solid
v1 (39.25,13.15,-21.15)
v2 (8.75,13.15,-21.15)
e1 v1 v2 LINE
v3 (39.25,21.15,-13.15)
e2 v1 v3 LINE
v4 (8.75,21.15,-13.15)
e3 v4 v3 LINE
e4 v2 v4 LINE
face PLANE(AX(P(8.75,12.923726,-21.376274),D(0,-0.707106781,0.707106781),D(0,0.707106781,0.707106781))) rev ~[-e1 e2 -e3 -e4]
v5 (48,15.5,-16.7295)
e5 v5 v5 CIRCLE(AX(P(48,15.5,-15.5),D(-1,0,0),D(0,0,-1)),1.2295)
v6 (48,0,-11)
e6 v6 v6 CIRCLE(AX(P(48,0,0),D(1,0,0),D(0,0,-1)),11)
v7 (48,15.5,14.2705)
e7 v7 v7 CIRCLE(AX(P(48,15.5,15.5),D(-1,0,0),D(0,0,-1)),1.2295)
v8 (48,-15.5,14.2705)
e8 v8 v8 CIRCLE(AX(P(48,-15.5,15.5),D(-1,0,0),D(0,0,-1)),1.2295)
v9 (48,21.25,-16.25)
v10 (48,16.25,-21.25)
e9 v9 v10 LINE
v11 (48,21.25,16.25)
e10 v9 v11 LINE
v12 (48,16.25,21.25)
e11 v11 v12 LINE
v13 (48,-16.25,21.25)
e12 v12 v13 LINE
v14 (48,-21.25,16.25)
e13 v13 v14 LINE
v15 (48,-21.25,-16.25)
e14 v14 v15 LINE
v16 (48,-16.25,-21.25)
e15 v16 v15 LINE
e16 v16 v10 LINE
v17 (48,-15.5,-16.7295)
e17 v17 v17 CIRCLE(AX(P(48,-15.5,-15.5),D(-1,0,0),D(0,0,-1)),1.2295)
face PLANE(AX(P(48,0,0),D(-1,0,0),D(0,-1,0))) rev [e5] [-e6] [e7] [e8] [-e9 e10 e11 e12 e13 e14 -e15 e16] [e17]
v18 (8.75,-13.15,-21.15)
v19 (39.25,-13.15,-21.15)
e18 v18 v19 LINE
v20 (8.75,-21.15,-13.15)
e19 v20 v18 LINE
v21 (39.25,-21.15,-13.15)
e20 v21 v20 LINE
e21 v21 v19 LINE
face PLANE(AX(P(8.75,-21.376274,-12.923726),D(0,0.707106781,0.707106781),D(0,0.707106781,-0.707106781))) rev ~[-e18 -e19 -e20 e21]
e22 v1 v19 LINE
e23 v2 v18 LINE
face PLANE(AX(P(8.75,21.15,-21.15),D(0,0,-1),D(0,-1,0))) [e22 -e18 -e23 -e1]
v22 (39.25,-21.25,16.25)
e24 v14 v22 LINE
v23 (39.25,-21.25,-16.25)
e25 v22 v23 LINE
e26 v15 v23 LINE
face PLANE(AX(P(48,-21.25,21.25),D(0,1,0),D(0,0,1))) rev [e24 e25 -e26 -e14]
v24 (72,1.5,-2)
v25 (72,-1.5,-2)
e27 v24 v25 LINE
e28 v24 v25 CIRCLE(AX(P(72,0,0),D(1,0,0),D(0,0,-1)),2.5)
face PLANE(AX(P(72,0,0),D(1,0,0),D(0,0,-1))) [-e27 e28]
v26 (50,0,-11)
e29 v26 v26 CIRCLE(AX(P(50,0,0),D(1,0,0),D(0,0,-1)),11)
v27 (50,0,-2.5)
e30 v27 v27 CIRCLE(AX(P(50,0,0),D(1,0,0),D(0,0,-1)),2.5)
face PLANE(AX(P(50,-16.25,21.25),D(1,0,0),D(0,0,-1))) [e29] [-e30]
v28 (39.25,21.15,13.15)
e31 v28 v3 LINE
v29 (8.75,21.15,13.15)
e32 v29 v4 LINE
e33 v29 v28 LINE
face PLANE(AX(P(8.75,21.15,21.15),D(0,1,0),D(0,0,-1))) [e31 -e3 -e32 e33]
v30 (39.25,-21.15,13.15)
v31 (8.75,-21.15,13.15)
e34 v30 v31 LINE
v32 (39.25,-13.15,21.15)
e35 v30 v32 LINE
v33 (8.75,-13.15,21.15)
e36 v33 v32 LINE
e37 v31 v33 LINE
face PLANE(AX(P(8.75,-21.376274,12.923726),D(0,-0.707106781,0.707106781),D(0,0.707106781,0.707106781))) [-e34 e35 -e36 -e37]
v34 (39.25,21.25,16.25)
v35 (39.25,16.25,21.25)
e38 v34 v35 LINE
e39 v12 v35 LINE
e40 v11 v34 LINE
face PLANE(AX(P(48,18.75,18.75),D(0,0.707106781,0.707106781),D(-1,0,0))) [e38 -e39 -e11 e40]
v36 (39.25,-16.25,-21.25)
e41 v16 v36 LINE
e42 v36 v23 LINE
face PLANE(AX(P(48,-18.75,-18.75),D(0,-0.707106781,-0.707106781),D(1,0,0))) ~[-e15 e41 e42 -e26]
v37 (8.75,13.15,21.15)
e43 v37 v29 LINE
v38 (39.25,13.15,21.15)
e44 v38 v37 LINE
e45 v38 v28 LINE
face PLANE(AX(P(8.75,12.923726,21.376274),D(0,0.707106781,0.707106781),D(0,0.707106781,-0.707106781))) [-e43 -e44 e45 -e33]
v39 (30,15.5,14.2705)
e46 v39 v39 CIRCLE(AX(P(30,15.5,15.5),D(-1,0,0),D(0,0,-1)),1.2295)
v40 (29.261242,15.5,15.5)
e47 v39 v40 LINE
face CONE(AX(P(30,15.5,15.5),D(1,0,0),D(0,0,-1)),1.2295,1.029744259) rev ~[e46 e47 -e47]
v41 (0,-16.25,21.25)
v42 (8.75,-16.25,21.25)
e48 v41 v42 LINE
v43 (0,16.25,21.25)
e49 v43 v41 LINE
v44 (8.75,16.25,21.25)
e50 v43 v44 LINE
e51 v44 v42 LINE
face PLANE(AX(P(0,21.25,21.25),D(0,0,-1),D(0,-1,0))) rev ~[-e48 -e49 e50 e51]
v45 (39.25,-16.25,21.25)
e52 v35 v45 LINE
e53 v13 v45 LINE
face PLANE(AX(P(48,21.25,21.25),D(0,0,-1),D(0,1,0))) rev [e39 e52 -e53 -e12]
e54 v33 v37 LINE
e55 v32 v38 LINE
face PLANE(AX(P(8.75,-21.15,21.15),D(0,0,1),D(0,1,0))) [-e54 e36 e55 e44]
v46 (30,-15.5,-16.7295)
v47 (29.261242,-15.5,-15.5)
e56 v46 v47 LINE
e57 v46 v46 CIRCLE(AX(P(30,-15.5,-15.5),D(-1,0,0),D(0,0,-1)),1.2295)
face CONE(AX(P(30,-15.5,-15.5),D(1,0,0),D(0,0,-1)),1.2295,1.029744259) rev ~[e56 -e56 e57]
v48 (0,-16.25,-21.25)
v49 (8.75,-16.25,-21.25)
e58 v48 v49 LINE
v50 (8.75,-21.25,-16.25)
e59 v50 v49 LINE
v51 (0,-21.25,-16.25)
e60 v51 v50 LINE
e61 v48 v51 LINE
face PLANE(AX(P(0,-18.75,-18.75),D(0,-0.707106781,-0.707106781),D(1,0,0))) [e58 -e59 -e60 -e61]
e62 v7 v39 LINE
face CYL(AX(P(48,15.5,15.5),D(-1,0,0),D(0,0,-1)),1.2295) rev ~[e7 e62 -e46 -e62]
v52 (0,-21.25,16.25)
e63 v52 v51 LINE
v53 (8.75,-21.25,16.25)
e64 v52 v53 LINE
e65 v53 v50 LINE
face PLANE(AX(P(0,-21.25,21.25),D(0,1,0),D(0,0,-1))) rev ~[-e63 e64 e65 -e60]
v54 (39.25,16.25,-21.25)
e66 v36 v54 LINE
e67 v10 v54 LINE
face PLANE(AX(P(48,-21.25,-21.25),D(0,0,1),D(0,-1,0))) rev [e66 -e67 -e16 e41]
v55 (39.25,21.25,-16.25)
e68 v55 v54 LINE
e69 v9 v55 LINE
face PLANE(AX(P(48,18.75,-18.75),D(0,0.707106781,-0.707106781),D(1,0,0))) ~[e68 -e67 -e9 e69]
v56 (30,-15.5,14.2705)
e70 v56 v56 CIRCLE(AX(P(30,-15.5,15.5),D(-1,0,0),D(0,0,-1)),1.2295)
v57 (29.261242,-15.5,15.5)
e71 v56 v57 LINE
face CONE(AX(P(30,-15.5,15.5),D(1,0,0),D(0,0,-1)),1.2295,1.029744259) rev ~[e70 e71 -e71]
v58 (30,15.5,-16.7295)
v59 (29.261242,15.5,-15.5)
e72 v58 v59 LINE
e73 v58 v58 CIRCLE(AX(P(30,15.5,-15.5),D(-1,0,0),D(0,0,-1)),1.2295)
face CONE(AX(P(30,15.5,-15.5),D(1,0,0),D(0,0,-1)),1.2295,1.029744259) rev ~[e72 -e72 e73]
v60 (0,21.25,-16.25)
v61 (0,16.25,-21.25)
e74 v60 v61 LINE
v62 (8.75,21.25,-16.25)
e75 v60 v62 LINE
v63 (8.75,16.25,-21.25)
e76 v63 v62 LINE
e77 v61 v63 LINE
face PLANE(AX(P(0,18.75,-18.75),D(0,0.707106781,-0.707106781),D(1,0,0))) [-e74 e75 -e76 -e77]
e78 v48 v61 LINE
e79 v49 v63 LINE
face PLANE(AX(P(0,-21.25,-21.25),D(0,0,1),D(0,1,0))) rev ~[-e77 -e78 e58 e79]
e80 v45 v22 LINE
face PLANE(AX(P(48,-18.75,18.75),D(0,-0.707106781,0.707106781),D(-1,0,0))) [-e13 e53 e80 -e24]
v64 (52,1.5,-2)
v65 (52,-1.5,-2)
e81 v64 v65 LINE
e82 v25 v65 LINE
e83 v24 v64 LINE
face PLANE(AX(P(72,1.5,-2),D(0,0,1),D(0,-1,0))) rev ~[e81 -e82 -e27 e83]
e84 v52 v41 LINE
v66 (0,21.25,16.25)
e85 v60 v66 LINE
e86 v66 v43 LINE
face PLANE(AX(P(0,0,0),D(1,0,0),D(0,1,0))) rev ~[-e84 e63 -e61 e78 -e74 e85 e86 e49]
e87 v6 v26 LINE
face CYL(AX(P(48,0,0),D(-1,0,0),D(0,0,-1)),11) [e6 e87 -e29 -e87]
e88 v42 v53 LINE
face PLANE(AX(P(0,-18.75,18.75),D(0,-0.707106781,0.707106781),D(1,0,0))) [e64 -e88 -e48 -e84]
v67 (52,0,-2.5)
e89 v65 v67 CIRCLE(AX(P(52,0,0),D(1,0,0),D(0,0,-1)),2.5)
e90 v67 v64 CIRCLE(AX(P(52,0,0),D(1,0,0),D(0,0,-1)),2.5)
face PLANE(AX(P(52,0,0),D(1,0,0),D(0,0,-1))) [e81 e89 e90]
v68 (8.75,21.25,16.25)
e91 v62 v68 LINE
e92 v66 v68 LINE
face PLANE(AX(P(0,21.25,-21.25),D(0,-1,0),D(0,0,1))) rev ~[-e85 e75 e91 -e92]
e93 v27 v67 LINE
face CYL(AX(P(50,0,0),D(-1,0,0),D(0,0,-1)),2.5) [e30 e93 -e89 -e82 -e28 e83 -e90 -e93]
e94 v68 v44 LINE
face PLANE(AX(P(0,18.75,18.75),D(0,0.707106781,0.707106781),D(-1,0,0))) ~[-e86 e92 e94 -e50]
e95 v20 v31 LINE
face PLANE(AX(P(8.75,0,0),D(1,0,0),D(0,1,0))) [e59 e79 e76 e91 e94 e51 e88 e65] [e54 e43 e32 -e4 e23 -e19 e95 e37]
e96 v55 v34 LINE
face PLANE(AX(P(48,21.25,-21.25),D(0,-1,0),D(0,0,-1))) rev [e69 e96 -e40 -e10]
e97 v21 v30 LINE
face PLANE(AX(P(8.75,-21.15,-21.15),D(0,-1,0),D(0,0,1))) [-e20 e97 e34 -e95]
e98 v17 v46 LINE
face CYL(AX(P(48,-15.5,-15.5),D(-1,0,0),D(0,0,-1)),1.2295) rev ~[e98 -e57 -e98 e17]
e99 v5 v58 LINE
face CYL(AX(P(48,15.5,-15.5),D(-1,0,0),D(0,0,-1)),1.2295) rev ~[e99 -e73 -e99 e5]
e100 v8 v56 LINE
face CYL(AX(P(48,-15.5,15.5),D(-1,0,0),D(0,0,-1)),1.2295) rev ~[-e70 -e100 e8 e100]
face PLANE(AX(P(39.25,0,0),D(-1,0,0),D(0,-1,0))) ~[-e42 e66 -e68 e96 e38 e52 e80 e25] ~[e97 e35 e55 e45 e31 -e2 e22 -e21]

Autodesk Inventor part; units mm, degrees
ref_plane "YZ Plane" through (0, 0, 0) normal (1, 0, 0) x (0, 1, 0)
ref_plane "XZ Plane" through (0, 0, 0) normal (0, 1, 0) x (-1, 0, 0)
sketch "Sketch1" plane through (0, 0, 0) normal (1, 0, 0) x (0, 1, 0)
  line L0 (21.25, 21.25) -> (-21.25, 21.25)
  line L1 (-21.25, 21.25) -> (-21.25, -21.25)
  line L2 (-21.25, -21.25) -> (21.25, -21.25)
  line L3 (21.25, -21.25) -> (21.25, 21.25)
  line L4 (21.25, 21.25) -> (-21.25, -21.25) construction
  line L5 (-21.25, 21.25) -> (21.25, -21.25) construction
  point P0 (0, 0)
  dimension "d0" = 42.5
  dimension "d1" = 42.5
extrude "Extrusion1" add sketch "Sketch1" along normal blind 8.75
chamfer "Chamfer1" distance 5 angle 45 4 edges at (4.375, 21.25, 21.25) (4.375, 21.25, -21.25) (4.375, -21.25, 21.25) (4.375, -21.25, -21.25)
sketch "Sketch2" plane through (8.75, 0, 0) normal (1, 0, 0) x (0, 0, -1)
  line L0 (21.15, -21.15) -> (-21.15, -21.15)
  line L1 (-21.15, -21.15) -> (-21.15, 21.15)
  line L2 (-21.15, 21.15) -> (21.15, 21.15)
  line L3 (21.15, 21.15) -> (21.15, -21.15)
  line L4 (21.15, -21.15) -> (-21.15, 21.15) construction
  line L5 (-21.15, -21.15) -> (21.15, 21.15) construction
  point P0 (0, 0)
  dimension "d7" = 42.3
  dimension "d8" = 42.3
extrude "Extrusion2" add sketch "Sketch2" along normal blind 30.5
chamfer "Chamfer2" distance 8 angle 45 4 edges at (24, 21.15, 21.15) (24, 21.15, -21.15) (24, -21.15, 21.15) (24, -21.15, -21.15)
ref_plane "Work Plane1" through (24, 0, 0) normal (1, 0, 0) x (0, 0, -1)
mirror "Mirror1" about plane through (24, 0, 0) normal (1, 0, 0) of "Extrusion1"
chamfer "Chamfer3" distance 5 angle 45 4 edges at (43.625, 21.25, -21.25) (43.625, -21.25, -21.25) (43.625, -21.25, 21.25) (43.625, 21.25, 21.25)
sketch "Sketch3" plane through (48, -16.25, 21.25) normal (1, 0, 0) x (0, 0, -1)
  point P0 (21.25, 16.25)
  point P1 (36.75, 31.75)
  point P2 (36.75, 0.75)
  point P3 (5.75, 0.75)
  point P4 (5.75, 31.75)
  dimension "d17" = 31
  dimension "d18" = 31
  dimension "d19" = 15.5
  dimension "d20" = 15.5
hole "Hole1" at (48, 15.5, -15.5) at (48, -15.5, -15.5) at (48, -15.5, 15.5) at (48, 15.5, 15.5) direction (-1, 0, 0) diameter 2.459 depth 18 tip angle 118 thread size "M3x0.5" class "6H" standard "ISO Metric profile"
sketch "Sketch4" plane through (48, -16.25, 21.25) normal (1, 0, 0) x (0, 0, -1)
  circle A0 centre (21.25, 16.25) radius 11
  dimension "d28" = 22
extrude "Extrusion3" add sketch "Sketch4" along normal blind 2
sketch "Sketch5" plane through (50, 0, 0) normal (1, 0, 0) x (0, 0, -1)
  circle A0 centre (0, 0) radius 2.5
  dimension "d31" = 5
extrude "Extrusion4" add sketch "Sketch5" along normal blind 22
sketch "Sketch6" plane through (72, 0, 0) normal (1, 0, 0) x (0, 0, -1)
  circle A0 centre (0, 0) radius 2.5 projected
  line L0 (2, 1.5) -> (2, -1.5)
  point P0 (2, 0)
  dimension "d34" = 2
extrude "Extrusion5" cut sketch "Sketch6" against normal blind 20 contours A0 L0 picked at (2.0912, -0.3466)
equation "\"d1\" = d0"
equation "\"d8\" = d7"
equation "\"d18\" = d17"
properties part number "HCMUTE-CDT23-OP_STEP-42"
